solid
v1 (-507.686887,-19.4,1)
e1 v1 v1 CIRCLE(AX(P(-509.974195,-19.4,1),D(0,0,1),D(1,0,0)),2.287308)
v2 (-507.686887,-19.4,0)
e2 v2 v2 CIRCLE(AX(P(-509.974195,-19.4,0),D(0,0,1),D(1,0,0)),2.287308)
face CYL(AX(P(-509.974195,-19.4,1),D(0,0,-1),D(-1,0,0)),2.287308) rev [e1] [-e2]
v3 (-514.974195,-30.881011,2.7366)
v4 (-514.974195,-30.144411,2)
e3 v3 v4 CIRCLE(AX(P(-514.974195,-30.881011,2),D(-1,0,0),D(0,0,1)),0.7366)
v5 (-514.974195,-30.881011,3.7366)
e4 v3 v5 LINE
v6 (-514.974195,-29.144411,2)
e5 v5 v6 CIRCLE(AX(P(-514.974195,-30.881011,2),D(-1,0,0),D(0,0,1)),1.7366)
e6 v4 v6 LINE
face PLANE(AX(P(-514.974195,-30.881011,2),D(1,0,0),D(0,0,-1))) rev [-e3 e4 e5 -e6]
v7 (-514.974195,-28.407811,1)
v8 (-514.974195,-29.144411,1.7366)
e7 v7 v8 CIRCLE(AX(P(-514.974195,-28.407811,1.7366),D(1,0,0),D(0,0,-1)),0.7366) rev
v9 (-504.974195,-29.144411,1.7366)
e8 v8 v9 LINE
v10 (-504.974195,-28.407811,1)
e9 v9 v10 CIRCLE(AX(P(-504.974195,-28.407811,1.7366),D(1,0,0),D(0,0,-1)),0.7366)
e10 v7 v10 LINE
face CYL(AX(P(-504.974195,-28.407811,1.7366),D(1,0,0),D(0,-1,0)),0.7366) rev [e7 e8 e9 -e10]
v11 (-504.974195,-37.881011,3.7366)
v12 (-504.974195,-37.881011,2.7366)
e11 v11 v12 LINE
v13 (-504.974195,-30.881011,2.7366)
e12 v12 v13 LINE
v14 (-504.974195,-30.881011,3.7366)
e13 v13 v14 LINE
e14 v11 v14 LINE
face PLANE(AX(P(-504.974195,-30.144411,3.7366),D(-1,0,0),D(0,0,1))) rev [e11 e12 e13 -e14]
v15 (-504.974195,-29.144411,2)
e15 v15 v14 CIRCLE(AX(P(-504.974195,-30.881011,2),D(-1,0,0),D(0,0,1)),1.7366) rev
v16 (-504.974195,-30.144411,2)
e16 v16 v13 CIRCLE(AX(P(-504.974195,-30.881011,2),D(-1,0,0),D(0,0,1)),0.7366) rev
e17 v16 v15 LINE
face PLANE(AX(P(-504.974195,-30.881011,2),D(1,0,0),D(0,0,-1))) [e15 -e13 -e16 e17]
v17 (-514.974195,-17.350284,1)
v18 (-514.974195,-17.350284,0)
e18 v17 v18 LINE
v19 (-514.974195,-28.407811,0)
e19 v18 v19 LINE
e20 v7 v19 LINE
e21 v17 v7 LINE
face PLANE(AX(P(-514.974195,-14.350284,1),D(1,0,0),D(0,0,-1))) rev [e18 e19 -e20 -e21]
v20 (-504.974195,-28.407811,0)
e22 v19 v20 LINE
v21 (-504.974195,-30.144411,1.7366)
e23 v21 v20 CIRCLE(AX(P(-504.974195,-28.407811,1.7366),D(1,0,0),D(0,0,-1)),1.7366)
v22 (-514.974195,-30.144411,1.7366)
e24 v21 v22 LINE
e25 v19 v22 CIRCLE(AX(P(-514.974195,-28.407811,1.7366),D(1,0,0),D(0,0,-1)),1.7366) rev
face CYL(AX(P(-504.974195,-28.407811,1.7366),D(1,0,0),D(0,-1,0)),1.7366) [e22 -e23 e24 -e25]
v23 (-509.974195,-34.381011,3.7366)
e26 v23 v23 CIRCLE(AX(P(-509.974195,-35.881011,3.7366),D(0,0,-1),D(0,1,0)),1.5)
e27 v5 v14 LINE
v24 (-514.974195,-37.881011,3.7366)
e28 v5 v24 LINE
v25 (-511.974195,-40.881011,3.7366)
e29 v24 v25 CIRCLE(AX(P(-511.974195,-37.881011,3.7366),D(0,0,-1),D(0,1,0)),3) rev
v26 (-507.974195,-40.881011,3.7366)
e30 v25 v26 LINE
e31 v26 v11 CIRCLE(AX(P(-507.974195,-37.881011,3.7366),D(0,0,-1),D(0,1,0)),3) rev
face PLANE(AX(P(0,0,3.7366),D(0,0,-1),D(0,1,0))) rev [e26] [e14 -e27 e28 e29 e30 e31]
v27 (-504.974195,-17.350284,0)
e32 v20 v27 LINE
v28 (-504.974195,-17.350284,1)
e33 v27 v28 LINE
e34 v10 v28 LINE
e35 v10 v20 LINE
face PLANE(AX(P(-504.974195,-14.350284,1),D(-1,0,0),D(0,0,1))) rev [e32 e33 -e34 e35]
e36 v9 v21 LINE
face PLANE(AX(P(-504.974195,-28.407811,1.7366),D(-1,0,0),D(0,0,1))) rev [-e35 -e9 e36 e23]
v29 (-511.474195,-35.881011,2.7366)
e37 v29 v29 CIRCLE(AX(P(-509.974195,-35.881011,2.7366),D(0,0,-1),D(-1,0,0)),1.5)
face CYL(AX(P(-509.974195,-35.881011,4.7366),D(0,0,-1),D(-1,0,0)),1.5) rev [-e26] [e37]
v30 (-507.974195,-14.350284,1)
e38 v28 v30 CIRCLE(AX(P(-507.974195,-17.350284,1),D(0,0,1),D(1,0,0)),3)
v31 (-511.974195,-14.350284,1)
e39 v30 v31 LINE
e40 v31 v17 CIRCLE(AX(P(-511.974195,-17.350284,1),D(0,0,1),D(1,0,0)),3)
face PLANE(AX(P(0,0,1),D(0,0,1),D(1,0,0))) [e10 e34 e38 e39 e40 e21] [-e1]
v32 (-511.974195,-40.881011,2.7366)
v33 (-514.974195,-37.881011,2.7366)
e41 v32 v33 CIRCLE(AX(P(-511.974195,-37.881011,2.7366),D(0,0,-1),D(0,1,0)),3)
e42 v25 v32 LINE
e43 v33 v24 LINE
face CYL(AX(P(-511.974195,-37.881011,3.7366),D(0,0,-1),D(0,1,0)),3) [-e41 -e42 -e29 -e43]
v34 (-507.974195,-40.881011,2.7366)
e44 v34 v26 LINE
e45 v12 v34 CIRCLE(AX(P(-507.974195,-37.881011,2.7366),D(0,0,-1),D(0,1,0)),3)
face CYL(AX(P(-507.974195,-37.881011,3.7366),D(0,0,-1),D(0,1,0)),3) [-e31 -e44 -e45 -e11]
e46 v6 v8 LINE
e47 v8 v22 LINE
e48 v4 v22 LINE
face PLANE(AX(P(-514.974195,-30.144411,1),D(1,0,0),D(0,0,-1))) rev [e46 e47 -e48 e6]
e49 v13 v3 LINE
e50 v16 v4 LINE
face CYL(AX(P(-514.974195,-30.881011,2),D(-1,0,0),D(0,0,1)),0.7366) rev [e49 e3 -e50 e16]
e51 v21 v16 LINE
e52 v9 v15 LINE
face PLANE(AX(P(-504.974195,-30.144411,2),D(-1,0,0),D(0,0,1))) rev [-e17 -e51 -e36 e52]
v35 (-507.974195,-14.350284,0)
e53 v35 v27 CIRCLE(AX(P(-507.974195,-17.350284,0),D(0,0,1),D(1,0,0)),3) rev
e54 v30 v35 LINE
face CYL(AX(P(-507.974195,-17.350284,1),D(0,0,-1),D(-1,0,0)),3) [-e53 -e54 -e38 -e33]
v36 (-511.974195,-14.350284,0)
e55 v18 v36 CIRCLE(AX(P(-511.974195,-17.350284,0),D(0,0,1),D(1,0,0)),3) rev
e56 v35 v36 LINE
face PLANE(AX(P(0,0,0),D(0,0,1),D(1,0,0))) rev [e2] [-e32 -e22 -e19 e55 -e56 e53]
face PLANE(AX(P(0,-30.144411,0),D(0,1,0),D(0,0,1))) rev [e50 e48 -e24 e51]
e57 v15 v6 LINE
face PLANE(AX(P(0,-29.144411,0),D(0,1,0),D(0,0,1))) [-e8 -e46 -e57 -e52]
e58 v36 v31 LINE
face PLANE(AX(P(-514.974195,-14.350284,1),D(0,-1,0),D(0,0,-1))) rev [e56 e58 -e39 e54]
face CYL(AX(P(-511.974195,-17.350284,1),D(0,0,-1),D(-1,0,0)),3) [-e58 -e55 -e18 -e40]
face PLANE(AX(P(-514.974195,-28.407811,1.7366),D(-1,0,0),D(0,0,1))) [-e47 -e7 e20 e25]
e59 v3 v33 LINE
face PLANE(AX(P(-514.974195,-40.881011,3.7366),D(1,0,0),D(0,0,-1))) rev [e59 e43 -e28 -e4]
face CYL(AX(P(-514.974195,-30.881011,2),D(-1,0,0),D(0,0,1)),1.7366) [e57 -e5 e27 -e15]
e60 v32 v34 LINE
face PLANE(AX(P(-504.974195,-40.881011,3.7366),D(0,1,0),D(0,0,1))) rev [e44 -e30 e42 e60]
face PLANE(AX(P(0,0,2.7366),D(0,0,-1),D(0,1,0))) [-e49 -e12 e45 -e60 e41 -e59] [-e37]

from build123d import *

# Parameters (mm, degrees)
SKETCH1_W          = 10
SKETCH1_H          = 14.057527786
SKETCH1_R          = 2.287307526
BASE_FLANGE1_DEPTH = 1
EDGE_FLANGE1_DEPTH = 10
EDGE_FLANGE2_DEPTH = 10
SKETCH12_R         = 1.5
CUT_EXTRUDE1_DEPTH = 2
FILLET1_R          = 3


# Sheet-metal steps are written as plain solids
with BuildPart() as part:
    # Sketch1 → Base-Flange1 (new body)
    with BuildSketch(Plane.XY):
        with Locations((-509.974194853, -21.379047402)):
            Rectangle(SKETCH1_W, SKETCH1_H)
        with Locations((-509.974194853, -19.4)):
            Circle(SKETCH1_R, mode=Mode.SUBTRACT)
    extrude(amount=BASE_FLANGE1_DEPTH)

    # Edge-Flange1 section (across the edge) → Edge-Flange1 (add)
    with BuildSketch(Plane(origin=(-514.974194853, -29.144411295, 1), x_dir=(0, 1, 0), z_dir=(1, 0, 0))):
        with BuildLine():
            Line((-1, 0.7366), (-1, 1))
            Line((-1, 1), (0, 1))
            Line((0, 1), (0, 0.7366))
            ThreePointArc((0, 0.7366), (0.215745145, 0.215745145), (0.7366, 0))
            Line((0.7366, 0), (0.7366, -1))
            ThreePointArc((0.7366, -1), (-0.491361636, -0.491361636), (-1, 0.7366))
        make_face()
    extrude(amount=EDGE_FLANGE1_DEPTH)

    # Edge-Flange2 section (across the edge) → Edge-Flange2 (add)
    with BuildSketch(Plane(origin=(-504.974194853, -30.144411295, 2.7366), x_dir=(0, 0, -1), z_dir=(-1, 0, 0))):
        with BuildLine():
            Line((-1, 0.7366), (-1, 10.7366))
            Line((-1, 10.7366), (0, 10.7366))
            Line((0, 10.7366), (0, 0.7366))
            ThreePointArc((0, 0.7366), (0.215745145, 0.215745145), (0.7366, 0))
            Line((0.7366, 0), (0.7366, -1))
            ThreePointArc((0.7366, -1), (-0.491361636, -0.491361636), (-1, 0.7366))
        make_face()
    extrude(amount=EDGE_FLANGE2_DEPTH)

    # Sketch12 → Cut-Extrude1 (cut)
    with BuildSketch(Plane(origin=(0, 0, 2.7366), x_dir=(-1, 0, 0), z_dir=(0, 0, -1))):
        with Locations((509.974194853, -35.881011295)):
            Circle(SKETCH12_R)
    extrude(amount=-CUT_EXTRUDE1_DEPTH, mode=Mode.SUBTRACT)

    # Fillet1
    fillet1_edges = [part.edges().sort_by_distance(p)[0] for p in [
        (-504.974194853, -40.881011295, 3.2366),
        (-514.974194853, -40.881011295, 3.2366),
        (-514.974194853, -14.350283509, 0.5),
        (-504.974194853, -14.350283509, 0.5),
    ]]
    fillet(fillet1_edges, radius=FILLET1_R)


solid = part.part
